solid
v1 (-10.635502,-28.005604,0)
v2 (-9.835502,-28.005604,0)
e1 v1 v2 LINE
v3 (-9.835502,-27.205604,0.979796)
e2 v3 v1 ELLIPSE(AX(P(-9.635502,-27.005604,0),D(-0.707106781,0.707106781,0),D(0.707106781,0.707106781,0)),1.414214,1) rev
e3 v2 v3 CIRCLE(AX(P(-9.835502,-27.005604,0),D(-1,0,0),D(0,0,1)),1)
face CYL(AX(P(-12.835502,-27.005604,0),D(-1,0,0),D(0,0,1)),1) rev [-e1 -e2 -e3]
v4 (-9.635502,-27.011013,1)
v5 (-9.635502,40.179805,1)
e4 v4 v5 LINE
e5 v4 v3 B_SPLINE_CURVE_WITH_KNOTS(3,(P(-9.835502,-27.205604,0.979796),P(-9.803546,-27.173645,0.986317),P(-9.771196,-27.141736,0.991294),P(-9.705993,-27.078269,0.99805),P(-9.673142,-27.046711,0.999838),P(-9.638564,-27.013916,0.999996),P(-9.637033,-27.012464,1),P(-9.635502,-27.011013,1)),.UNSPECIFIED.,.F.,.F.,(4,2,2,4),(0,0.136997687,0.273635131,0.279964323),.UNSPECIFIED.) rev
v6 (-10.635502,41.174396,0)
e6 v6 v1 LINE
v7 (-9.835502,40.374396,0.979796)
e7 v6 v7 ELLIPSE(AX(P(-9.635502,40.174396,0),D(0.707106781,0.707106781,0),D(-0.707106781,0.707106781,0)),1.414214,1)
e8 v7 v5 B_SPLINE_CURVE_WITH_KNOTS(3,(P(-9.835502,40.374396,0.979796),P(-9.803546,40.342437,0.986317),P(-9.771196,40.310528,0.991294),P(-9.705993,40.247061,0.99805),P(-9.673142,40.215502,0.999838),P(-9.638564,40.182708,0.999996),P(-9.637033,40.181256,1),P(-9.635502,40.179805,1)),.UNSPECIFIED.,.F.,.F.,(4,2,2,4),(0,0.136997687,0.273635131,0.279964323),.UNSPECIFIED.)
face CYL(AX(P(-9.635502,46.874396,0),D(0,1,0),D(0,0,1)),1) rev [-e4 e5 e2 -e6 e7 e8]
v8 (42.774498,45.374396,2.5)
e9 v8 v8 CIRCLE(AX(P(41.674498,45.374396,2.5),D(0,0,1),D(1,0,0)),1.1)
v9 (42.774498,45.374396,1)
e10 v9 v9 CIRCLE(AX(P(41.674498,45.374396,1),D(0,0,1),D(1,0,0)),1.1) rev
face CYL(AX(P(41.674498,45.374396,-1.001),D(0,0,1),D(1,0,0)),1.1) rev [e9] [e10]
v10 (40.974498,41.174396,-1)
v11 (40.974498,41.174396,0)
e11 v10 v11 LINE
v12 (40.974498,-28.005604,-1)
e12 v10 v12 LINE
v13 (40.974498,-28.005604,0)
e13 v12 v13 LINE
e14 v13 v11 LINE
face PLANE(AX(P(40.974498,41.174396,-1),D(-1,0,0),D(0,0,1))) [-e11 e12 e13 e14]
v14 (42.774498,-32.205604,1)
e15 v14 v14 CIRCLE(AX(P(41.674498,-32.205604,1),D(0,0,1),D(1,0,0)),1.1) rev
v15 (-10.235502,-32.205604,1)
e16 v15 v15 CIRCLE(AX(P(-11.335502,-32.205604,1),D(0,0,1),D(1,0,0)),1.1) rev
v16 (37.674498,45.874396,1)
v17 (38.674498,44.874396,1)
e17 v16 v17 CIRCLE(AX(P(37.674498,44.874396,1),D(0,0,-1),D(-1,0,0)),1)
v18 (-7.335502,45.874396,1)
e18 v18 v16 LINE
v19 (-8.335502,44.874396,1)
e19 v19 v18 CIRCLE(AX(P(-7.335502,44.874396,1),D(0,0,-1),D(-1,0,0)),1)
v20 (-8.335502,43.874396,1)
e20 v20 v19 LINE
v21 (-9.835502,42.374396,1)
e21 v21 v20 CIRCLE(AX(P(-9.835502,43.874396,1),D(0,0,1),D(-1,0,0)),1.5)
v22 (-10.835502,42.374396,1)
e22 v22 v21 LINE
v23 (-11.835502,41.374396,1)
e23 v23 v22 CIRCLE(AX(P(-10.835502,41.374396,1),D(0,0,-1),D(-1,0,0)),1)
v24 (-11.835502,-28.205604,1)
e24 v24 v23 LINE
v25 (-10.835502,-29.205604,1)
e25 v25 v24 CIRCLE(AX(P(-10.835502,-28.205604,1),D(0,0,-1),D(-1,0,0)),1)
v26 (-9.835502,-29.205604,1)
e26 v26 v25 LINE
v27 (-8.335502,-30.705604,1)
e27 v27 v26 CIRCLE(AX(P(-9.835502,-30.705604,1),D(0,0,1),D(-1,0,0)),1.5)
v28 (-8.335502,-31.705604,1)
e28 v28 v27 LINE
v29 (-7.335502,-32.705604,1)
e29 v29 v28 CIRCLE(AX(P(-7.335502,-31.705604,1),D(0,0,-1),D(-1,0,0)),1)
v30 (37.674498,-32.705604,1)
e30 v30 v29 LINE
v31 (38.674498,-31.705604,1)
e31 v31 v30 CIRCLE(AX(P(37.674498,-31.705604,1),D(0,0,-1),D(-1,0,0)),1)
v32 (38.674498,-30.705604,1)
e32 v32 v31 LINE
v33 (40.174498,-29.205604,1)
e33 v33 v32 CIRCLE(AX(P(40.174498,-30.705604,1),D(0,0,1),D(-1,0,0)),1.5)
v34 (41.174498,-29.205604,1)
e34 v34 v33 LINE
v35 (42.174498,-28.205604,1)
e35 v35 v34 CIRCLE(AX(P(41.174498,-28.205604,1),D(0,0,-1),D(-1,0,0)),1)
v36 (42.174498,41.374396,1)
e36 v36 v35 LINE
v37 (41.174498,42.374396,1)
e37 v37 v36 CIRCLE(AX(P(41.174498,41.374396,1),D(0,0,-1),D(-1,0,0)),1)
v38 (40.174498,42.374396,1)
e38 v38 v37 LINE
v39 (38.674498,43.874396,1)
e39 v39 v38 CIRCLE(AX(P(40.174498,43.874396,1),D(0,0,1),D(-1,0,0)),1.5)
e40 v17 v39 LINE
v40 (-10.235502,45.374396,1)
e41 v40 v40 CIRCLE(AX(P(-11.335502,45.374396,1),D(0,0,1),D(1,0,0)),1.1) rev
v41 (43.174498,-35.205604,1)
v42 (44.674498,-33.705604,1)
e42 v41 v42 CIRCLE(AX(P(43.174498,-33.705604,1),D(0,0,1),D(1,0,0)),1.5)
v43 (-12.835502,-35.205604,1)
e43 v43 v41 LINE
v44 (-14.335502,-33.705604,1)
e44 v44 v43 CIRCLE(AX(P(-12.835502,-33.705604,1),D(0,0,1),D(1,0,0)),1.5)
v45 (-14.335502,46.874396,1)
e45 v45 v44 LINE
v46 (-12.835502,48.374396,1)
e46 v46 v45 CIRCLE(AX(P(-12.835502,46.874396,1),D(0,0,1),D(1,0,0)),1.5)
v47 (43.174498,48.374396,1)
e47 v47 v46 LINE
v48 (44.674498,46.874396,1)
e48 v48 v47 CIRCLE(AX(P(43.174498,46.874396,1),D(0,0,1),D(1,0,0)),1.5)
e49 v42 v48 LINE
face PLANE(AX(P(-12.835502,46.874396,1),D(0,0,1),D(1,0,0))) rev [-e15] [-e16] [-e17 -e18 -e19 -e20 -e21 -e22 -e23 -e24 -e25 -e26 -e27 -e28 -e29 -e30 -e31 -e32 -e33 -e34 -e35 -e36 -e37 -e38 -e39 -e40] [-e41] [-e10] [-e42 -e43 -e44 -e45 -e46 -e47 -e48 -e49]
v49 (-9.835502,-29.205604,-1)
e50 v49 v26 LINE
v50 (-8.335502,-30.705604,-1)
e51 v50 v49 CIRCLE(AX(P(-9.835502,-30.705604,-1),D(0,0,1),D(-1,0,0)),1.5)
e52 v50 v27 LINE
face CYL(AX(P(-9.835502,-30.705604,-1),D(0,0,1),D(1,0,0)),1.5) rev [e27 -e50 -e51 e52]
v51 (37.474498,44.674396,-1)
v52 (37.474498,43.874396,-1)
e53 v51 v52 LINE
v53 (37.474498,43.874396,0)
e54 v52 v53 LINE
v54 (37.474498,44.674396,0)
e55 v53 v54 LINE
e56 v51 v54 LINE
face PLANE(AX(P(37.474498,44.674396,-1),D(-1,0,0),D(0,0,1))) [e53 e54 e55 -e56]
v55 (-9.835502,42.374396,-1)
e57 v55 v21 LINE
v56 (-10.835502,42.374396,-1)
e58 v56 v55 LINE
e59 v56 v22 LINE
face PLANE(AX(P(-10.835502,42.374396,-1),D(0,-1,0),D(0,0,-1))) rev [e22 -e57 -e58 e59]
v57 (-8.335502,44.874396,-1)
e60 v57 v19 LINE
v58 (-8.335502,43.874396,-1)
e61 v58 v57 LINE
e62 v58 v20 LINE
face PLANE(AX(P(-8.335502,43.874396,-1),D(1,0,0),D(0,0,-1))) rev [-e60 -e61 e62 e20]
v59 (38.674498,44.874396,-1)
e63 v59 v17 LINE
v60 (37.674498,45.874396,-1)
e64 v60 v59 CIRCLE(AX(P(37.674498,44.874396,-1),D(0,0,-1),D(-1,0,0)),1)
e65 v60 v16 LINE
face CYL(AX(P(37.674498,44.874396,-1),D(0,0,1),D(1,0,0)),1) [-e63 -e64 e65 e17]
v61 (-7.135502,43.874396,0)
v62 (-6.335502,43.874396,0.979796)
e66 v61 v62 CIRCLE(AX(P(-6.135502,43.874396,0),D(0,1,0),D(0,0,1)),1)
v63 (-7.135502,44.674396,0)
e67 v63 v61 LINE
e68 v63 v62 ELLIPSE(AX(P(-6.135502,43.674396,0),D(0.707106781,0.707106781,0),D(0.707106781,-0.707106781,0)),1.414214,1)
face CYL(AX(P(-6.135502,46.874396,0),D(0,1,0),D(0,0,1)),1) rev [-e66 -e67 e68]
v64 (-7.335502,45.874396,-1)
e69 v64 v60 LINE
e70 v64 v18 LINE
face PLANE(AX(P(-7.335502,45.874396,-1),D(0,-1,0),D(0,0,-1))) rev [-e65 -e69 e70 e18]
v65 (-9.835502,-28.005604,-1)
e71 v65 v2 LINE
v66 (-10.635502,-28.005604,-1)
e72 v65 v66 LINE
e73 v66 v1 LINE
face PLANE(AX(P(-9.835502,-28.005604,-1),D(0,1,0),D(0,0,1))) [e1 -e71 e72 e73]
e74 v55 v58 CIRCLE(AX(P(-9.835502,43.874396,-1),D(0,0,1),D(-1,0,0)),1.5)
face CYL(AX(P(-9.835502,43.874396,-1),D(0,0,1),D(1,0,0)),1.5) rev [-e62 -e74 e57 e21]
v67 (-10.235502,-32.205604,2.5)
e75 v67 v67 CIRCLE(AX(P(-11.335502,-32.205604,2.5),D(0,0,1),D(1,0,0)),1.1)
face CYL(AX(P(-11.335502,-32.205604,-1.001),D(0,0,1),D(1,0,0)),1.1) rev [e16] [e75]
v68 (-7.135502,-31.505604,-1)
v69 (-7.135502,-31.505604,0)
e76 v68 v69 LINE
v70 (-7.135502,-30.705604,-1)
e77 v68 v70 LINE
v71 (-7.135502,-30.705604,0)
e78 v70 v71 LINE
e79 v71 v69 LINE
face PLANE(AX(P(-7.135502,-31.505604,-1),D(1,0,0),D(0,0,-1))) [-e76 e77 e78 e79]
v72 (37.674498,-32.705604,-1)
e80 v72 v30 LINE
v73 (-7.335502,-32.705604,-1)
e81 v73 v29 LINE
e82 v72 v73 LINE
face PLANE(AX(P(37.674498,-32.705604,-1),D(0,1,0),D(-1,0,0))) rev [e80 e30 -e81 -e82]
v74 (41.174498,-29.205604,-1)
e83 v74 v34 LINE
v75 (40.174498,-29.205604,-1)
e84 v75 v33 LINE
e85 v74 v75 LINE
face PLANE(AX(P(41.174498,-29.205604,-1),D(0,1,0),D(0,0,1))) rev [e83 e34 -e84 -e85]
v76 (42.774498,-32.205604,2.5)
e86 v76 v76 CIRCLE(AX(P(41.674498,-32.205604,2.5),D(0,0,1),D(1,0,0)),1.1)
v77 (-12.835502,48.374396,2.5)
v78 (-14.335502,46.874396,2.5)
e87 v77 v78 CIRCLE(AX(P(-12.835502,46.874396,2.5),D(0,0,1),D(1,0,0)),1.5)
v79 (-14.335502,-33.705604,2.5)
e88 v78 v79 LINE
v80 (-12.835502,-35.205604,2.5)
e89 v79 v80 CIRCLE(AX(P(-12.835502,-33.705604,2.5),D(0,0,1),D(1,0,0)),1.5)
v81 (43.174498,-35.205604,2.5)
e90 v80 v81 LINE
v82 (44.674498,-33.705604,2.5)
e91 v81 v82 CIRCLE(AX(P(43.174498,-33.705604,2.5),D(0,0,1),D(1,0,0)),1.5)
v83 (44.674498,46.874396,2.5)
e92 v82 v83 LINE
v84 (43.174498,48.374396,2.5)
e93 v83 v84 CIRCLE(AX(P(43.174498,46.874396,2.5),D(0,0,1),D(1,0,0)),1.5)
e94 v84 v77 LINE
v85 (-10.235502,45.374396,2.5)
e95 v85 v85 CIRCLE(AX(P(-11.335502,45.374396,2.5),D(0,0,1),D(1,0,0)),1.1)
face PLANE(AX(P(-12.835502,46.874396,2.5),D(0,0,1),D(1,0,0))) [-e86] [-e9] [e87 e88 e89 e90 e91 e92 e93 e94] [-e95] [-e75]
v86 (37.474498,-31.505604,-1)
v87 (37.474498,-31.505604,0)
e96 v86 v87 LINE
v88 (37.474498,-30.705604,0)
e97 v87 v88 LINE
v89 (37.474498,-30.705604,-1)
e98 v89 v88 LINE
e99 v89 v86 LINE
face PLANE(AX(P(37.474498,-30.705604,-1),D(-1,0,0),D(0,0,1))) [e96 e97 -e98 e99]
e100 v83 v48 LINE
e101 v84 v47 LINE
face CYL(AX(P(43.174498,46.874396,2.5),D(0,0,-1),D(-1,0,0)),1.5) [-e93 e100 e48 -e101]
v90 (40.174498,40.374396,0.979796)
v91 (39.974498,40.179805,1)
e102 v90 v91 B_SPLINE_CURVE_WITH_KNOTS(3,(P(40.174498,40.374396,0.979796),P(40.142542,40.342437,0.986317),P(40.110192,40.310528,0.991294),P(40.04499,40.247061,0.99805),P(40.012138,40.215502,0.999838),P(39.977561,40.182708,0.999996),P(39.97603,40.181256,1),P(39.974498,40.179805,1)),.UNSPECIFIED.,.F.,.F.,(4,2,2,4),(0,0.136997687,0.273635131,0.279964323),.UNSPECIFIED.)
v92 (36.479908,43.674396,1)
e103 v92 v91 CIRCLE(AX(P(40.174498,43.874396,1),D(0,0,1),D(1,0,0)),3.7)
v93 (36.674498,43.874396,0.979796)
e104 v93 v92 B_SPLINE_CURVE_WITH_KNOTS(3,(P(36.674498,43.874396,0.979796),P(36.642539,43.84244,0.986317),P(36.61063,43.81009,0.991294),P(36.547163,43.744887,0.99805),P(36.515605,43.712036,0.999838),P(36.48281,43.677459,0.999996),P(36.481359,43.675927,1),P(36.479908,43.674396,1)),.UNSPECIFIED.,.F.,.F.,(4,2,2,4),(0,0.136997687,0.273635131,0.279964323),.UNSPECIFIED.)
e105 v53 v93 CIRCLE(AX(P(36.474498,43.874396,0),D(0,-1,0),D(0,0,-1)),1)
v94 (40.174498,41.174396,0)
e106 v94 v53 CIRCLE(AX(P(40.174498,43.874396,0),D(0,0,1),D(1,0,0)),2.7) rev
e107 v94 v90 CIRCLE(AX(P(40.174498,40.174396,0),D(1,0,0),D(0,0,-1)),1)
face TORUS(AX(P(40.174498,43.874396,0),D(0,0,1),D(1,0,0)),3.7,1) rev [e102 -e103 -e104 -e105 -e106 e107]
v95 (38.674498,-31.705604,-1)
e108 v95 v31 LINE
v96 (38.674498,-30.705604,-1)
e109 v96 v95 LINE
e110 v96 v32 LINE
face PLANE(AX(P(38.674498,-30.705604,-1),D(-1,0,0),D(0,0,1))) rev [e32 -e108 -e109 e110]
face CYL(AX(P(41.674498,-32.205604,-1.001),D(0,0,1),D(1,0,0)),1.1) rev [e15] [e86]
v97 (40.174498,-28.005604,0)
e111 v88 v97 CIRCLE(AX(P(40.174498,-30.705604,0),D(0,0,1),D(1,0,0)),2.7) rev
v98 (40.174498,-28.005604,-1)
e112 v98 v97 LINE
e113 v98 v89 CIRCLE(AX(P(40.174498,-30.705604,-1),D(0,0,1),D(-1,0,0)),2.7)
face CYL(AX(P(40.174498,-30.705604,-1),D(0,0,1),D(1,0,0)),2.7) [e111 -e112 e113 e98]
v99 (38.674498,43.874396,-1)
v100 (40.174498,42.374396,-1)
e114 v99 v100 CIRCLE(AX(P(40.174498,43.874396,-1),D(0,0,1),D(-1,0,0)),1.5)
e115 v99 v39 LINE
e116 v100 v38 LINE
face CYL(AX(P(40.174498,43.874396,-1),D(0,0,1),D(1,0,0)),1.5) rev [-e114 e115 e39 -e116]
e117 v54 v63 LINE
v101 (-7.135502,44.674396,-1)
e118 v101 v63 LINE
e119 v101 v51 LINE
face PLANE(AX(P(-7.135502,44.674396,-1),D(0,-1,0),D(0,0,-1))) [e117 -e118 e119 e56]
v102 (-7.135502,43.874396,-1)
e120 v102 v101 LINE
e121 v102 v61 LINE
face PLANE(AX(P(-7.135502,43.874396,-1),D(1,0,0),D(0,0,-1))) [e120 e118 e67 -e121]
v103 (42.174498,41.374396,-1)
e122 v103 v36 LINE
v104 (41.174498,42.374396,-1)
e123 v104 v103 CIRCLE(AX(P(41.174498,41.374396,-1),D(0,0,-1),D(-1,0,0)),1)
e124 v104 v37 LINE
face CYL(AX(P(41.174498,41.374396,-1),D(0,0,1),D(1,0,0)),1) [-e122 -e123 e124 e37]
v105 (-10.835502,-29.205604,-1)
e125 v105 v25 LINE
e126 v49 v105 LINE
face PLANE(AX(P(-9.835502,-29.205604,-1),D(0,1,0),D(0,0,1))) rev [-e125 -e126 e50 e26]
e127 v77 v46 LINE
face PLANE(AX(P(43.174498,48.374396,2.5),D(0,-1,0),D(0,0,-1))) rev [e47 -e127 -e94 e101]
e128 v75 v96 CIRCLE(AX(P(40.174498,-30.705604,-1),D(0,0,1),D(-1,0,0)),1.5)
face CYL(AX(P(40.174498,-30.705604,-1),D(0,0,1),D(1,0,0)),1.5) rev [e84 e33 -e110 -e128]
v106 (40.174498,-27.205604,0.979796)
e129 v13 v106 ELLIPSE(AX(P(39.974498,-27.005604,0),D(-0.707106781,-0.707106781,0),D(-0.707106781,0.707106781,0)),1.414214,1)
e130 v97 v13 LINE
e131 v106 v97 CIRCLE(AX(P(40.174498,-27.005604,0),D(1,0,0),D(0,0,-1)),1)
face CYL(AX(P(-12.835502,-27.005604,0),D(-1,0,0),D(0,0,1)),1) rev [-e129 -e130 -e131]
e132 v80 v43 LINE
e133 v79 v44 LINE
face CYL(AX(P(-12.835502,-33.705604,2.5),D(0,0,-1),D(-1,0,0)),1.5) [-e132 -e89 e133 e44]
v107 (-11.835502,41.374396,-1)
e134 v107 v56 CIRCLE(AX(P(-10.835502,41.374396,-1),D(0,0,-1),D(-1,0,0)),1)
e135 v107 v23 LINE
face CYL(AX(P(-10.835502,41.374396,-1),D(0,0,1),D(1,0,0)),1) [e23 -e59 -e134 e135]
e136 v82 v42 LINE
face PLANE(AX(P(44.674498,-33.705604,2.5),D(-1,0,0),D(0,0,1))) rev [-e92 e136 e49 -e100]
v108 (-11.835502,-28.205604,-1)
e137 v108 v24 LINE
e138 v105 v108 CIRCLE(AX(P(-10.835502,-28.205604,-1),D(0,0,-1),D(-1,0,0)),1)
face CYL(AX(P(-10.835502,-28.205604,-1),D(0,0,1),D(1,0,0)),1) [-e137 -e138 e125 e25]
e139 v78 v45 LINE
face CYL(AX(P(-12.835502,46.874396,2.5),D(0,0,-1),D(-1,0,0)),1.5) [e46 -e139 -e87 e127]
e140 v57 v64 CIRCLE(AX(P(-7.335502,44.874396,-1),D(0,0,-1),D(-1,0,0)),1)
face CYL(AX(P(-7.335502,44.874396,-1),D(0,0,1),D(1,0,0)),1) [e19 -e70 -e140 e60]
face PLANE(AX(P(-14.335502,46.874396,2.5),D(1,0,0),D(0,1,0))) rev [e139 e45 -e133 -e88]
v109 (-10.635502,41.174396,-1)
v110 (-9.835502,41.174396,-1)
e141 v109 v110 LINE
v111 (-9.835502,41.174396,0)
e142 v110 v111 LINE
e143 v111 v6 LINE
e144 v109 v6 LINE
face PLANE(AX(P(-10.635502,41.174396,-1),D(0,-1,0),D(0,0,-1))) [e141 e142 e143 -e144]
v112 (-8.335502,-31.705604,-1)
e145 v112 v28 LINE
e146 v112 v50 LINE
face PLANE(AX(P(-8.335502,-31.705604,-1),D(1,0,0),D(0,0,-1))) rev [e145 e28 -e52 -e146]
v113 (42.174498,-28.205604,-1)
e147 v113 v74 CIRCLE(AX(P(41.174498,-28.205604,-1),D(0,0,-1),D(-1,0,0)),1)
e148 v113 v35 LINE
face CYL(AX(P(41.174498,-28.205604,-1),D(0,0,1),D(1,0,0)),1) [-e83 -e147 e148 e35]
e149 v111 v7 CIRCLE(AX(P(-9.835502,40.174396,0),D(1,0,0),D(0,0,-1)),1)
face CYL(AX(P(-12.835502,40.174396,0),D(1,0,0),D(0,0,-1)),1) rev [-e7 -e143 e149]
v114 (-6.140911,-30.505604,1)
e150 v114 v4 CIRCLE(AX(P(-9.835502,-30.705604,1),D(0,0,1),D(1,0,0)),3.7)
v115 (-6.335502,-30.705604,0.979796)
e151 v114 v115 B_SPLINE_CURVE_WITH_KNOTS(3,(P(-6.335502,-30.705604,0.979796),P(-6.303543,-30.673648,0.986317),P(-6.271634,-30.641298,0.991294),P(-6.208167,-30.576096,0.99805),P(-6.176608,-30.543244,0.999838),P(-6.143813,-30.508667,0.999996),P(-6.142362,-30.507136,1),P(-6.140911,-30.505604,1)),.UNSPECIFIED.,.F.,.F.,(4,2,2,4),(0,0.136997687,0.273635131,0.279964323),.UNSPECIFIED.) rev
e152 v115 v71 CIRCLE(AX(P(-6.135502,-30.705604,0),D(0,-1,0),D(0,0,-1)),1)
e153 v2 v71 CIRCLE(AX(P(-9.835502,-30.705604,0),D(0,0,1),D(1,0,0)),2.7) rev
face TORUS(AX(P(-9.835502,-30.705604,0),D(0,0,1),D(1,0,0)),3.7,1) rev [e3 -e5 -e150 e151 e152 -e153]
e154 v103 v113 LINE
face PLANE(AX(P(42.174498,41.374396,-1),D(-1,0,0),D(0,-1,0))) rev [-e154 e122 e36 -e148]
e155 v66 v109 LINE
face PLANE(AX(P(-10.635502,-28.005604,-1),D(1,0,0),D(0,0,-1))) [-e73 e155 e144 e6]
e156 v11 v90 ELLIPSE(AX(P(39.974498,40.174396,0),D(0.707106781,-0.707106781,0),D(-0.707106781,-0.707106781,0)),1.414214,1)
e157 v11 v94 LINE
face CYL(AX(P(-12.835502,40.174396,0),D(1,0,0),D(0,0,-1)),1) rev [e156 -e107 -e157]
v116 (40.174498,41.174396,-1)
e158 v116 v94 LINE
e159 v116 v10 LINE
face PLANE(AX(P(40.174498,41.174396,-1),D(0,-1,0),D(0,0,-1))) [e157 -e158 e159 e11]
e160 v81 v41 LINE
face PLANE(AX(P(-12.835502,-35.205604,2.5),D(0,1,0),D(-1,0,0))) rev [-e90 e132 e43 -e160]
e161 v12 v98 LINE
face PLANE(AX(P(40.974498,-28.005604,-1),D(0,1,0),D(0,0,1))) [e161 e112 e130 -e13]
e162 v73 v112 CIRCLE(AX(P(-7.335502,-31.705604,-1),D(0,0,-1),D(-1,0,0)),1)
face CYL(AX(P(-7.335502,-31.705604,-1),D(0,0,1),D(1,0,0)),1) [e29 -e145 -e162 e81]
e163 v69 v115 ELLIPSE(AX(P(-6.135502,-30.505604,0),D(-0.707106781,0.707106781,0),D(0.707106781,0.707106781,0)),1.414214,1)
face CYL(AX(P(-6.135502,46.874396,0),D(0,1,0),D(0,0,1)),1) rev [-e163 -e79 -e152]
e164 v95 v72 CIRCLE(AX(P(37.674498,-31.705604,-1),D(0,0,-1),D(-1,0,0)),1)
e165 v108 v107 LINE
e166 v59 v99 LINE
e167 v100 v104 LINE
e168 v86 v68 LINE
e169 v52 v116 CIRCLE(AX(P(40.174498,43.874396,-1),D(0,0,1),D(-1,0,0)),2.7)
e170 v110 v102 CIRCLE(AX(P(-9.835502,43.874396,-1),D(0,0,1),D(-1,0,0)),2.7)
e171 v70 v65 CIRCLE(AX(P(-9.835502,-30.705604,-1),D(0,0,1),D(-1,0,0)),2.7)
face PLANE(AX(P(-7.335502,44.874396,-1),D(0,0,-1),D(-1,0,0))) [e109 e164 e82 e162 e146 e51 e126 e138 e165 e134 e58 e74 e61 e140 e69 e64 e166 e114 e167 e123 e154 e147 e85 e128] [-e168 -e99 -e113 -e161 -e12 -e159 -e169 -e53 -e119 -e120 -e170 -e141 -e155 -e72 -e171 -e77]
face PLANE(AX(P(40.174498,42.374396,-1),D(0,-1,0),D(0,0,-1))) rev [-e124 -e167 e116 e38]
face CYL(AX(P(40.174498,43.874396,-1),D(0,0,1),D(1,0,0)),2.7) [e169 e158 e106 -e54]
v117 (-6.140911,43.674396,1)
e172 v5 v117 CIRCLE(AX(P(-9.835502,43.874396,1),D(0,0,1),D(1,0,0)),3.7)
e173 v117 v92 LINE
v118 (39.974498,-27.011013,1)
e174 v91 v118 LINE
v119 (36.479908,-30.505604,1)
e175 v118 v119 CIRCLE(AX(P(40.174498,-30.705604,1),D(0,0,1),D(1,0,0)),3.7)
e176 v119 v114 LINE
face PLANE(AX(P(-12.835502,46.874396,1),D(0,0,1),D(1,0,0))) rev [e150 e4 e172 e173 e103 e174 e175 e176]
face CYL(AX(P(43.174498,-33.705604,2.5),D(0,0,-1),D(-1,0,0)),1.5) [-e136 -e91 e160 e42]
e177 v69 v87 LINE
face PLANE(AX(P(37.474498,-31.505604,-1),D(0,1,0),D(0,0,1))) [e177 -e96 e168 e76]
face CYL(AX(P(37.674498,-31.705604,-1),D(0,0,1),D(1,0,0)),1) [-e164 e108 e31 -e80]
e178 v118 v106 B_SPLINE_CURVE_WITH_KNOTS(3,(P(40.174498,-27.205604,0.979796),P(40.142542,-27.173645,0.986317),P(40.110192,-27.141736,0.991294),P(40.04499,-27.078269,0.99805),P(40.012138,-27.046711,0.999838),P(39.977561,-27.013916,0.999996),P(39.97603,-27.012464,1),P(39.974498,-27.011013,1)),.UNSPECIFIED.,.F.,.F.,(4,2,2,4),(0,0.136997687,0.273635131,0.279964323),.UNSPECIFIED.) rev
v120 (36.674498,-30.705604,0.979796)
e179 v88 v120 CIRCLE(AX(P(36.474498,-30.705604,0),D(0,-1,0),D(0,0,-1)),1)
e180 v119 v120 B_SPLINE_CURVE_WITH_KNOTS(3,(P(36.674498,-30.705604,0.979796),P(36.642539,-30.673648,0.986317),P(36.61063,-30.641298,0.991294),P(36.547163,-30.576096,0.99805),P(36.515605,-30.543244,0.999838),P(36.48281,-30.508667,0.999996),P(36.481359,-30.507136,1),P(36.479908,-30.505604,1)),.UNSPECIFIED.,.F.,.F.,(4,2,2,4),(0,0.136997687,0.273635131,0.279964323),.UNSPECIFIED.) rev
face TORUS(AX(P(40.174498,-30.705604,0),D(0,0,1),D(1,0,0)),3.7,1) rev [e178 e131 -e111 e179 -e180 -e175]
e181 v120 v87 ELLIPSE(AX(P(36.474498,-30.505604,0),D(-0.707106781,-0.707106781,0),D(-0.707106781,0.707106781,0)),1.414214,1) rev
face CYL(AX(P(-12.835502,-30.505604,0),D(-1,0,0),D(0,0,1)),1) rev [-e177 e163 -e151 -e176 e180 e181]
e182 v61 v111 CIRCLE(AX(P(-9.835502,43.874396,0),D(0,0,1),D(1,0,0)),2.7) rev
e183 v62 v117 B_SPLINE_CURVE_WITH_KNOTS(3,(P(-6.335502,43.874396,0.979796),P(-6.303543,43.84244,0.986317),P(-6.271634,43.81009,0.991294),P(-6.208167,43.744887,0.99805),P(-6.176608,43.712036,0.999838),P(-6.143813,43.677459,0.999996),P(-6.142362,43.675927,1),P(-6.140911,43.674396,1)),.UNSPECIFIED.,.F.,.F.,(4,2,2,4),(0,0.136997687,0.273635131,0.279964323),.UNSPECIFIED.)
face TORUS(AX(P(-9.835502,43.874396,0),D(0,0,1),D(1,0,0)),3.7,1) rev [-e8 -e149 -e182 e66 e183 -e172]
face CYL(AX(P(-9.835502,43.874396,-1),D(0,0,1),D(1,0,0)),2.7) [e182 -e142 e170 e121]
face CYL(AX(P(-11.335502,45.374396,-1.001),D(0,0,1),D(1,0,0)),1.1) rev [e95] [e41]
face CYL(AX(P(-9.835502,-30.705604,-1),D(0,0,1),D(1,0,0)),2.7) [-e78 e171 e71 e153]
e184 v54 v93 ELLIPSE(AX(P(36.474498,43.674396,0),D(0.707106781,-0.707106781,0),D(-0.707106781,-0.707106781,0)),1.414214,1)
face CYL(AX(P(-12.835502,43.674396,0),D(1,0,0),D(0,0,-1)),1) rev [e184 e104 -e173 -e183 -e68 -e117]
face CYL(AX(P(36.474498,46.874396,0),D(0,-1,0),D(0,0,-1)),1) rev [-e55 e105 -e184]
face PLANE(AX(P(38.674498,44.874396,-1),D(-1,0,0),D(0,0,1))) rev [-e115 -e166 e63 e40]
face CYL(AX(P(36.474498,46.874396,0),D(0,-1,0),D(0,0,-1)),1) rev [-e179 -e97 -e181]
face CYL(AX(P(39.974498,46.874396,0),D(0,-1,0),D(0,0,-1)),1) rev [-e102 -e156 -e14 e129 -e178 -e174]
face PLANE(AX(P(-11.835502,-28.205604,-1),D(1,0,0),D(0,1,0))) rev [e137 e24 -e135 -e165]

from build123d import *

# Parameters (mm, degrees)
LID_BASE_DEPTH = 1.5
INSERT_DEPTH   = 2
CONG_1_R       = 1
M3_HOLE_REACH  = 67.94
ESQUISSE5_R    = 1.1


with BuildPart() as part:
    # Esquisse3 → Lid_Base (new body)
    with BuildSketch(Plane.XY.offset(1)):
        with BuildLine():
            Line((-14.335501752, 46.874395923), (-14.335501752, -33.705604077))
            ThreePointArc((-14.335501752, -33.705604077), (-13.896161923, -34.766264249), (-12.835501752, -35.205604077))
            Line((-12.835501752, -35.205604077), (43.174498248, -35.205604077))
            ThreePointArc((43.174498248, -35.205604077), (44.23515842, -34.766264249), (44.674498248, -33.705604077))
            Line((44.674498248, -33.705604077), (44.674498248, 46.874395923))
            ThreePointArc((44.674498248, 46.874395923), (44.23515842, 47.935056095), (43.174498248, 48.374395923))
            Line((43.174498248, 48.374395923), (-12.835501752, 48.374395923))
            ThreePointArc((-12.835501752, 48.374395923), (-13.896161923, 47.935056095), (-14.335501752, 46.874395923))
        make_face()
    extrude(amount=LID_BASE_DEPTH)

    # Esquisse4 → Insert (add)
    with BuildSketch(Plane(origin=(0, 0, 1), x_dir=(-1, 0, 0), z_dir=(0, 0, -1))):
        with BuildLine():
            Line((7.335501752, 45.874395923), (-37.674498248, 45.874395923))
            ThreePointArc((-37.674498248, 45.874395923), (-38.38160503, 45.581502704), (-38.674498248, 44.874395923))
            Line((-38.674498248, 44.874395923), (-38.674498248, 43.874395923))
            ThreePointArc((-38.674498248, 43.874395923), (-39.113838077, 42.813735751), (-40.174498248, 42.374395923))
            Line((-40.174498248, 42.374395923), (-41.174498248, 42.374395923))
            ThreePointArc((-41.174498248, 42.374395923), (-41.88160503, 42.081502704), (-42.174498248, 41.374395923))
            Line((-42.174498248, 41.374395923), (-42.174498248, -28.205604077))
            ThreePointArc((-42.174498248, -28.205604077), (-41.88160503, -28.912710858), (-41.174498248, -29.205604077))
            Line((-41.174498248, -29.205604077), (-40.174498248, -29.205604077))
            ThreePointArc((-40.174498248, -29.205604077), (-39.113838077, -29.644943905), (-38.674498248, -30.705604077))
            Line((-38.674498248, -30.705604077), (-38.674498248, -31.705604077))
            ThreePointArc((-38.674498248, -31.705604077), (-38.38160503, -32.412710858), (-37.674498248, -32.705604077))
            Line((-37.674498248, -32.705604077), (7.335501752, -32.705604077))
            ThreePointArc((7.335501752, -32.705604077), (8.042608533, -32.412710858), (8.335501752, -31.705604077))
            Line((8.335501752, -31.705604077), (8.335501752, -30.705604077))
            ThreePointArc((8.335501752, -30.705604077), (8.77484158, -29.644943905), (9.835501752, -29.205604077))
            Line((9.835501752, -29.205604077), (10.835501752, -29.205604077))
            ThreePointArc((10.835501752, -29.205604077), (11.542608533, -28.912710858), (11.835501752, -28.205604077))
            Line((11.835501752, -28.205604077), (11.835501752, 41.374395923))
            ThreePointArc((11.835501752, 41.374395923), (11.542608533, 42.081502704), (10.835501752, 42.374395923))
            Line((10.835501752, 42.374395923), (9.835501752, 42.374395923))
            ThreePointArc((9.835501752, 42.374395923), (8.77484158, 42.813735751), (8.335501752, 43.874395923))
            Line((8.335501752, 43.874395923), (8.335501752, 44.874395923))
            ThreePointArc((8.335501752, 44.874395923), (8.042608533, 45.581502704), (7.335501752, 45.874395923))
        make_face()
        with BuildLine():
            Line((7.135501752, 44.674395923), (-37.474498248, 44.674395923))
            Line((-37.474498248, 44.674395923), (-37.474498248, 43.874395923))
            ThreePointArc((-37.474498248, 43.874395923), (-38.265309939, 41.965207614), (-40.174498248, 41.174395923))
            Line((-40.174498248, 41.174395923), (-40.974498248, 41.174395923))
            Line((-40.974498248, 41.174395923), (-40.974498248, -28.005604077))
            Line((-40.974498248, -28.005604077), (-40.174498248, -28.005604077))
            ThreePointArc((-40.174498248, -28.005604077), (-38.265309939, -28.796415768), (-37.474498248, -30.705604077))
            Line((-37.474498248, -30.705604077), (-37.474498248, -31.505604077))
            Line((-37.474498248, -31.505604077), (7.135501752, -31.505604077))
            Line((7.135501752, -31.505604077), (7.135501752, -30.705604077))
            ThreePointArc((7.135501752, -30.705604077), (7.926313442, -28.796415768), (9.835501752, -28.005604077))
            Line((9.835501752, -28.005604077), (10.635501752, -28.005604077))
            Line((10.635501752, -28.005604077), (10.635501752, 41.174395923))
            Line((10.635501752, 41.174395923), (9.835501752, 41.174395923))
            ThreePointArc((9.835501752, 41.174395923), (7.926313442, 41.965207614), (7.135501752, 43.874395923))
            Line((7.135501752, 43.874395923), (7.135501752, 44.674395923))
        make_face(mode=Mode.SUBTRACT)
    extrude(amount=INSERT_DEPTH)

    # Congé1
    # the kernel refuses this fillet: 1 mm, written as the material it adds along each edge
    with BuildSketch(Plane(origin=(-10.635501752, -28.005604077, 1), x_dir=(0, 0, -1), z_dir=(0, 1, 0)), Plane(origin=(40.974498248, 41.174395923, 1), x_dir=(0, 0, -1), z_dir=(0, -1, 0))) as cong_1_piece_1:
        with BuildLine():
            CenterArc((CONG_1_R, -CONG_1_R), CONG_1_R, 90, 90)
            Line((0, -CONG_1_R), (0, 0))
            Line((0, 0), (CONG_1_R, 0))
        make_face()
    extrude(amount=69.18)
    with BuildSketch(Plane(origin=(-9.835501752, -30.705604077, 1), x_dir=(1, 0, 0), z_dir=(0, -1, 0))) as cong_1_piece_2:
        with BuildLine():
            CenterArc((2.7 + CONG_1_R, -CONG_1_R), CONG_1_R, 90, 90)
            Line((2.7 + CONG_1_R, 0), (2.7, 0))
            Line((2.7, 0), (2.7, -CONG_1_R))
        make_face()
    revolve(axis=Axis((-9.835501752, -30.705604077, 1), (0, 0, 1)), revolution_arc=90)
    with BuildSketch(Plane(origin=(37.474498248, -31.505604077, 1), x_dir=(0, 0, -1), z_dir=(-1, 0, 0)), Plane(origin=(-7.135501752, 44.674395923, 1), x_dir=(0, 0, -1), z_dir=(1, 0, 0))) as cong_1_piece_3:
        with BuildLine():
            CenterArc((CONG_1_R, -CONG_1_R), CONG_1_R, 90, 90)
            Line((0, -CONG_1_R), (0, 0))
            Line((0, 0), (CONG_1_R, 0))
        make_face()
    extrude(amount=44.61)
    with BuildSketch(Plane(origin=(40.174498248, -30.705604077, 1), x_dir=(0, 1, 0), z_dir=(1, 0, 0))) as cong_1_piece_4:
        with BuildLine():
            CenterArc((2.7 + CONG_1_R, -CONG_1_R), CONG_1_R, 90, 90)
            Line((2.7 + CONG_1_R, 0), (2.7, 0))
            Line((2.7, 0), (2.7, -CONG_1_R))
        make_face()
    revolve(axis=Axis((40.174498248, -30.705604077, 1), (0, 0, 1)), revolution_arc=90)
    with BuildSketch(Plane(origin=(40.174498248, 43.874395923, 1), x_dir=(-1, 0, 0), z_dir=(0, 1, 0))) as cong_1_piece_5:
        with BuildLine():
            CenterArc((2.7 + CONG_1_R, -CONG_1_R), CONG_1_R, 90, 90)
            Line((2.7 + CONG_1_R, 0), (2.7, 0))
            Line((2.7, 0), (2.7, -CONG_1_R))
        make_face()
    revolve(axis=Axis((40.174498248, 43.874395923, 1), (0, 0, 1)), revolution_arc=90)
    with BuildSketch(Plane(origin=(-9.835501752, 43.874395923, 1), x_dir=(0, -1, 0), z_dir=(-1, 0, 0))) as cong_1_piece_6:
        with BuildLine():
            CenterArc((2.7 + CONG_1_R, -CONG_1_R), CONG_1_R, 90, 90)
            Line((2.7 + CONG_1_R, 0), (2.7, 0))
            Line((2.7, 0), (2.7, -CONG_1_R))
        make_face()
    revolve(axis=Axis((-9.835501752, 43.874395923, 1), (0, 0, 1)), revolution_arc=90)
    with BuildSketch(Plane(origin=(-10.635501752, 41.174395923, 1), x_dir=(0, 0, -1), z_dir=(1, 0, 0)), Plane(origin=(-7.135501752, 43.874395923, 1), x_dir=(0, 0, -1), z_dir=(0, 1, 0)), Plane(origin=(37.474498248, 44.674395923, 1), x_dir=(0, 0, -1), z_dir=(0, -1, 0)), Plane(origin=(40.174498248, 41.174395923, 1), x_dir=(0, 0, -1), z_dir=(1, 0, 0)), Plane(origin=(40.974498248, -28.005604077, 1), x_dir=(0, 0, -1), z_dir=(-1, 0, 0)), Plane(origin=(37.474498248, -30.705604077, 1), x_dir=(0, 0, -1), z_dir=(0, -1, 0)), Plane(origin=(-7.135501752, -31.505604077, 1), x_dir=(0, 0, -1), z_dir=(0, 1, 0)), Plane(origin=(-9.835501752, -28.005604077, 1), x_dir=(0, 0, -1), z_dir=(-1, 0, 0))) as cong_1_piece_7:
        with BuildLine():
            CenterArc((CONG_1_R, -CONG_1_R), CONG_1_R, 90, 90)
            Line((0, -CONG_1_R), (0, 0))
            Line((0, 0), (CONG_1_R, 0))
        make_face()
    extrude(amount=0.8)

    # Esquisse5 → M3_Hole (cut, up to next)
    with BuildSketch(Plane.XY.offset(2.5), mode=Mode.PRIVATE) as m3_hole_sk1:
        with Locations((-11.335501752, -32.205604077)):
            Circle(ESQUISSE5_R)
    m3_hole_tool1 = extrude(m3_hole_sk1.sketch, amount=-M3_HOLE_REACH, mode=Mode.PRIVATE) & part.part
    # Esquisse5 → M3_Hole (cut, up to next)
    with BuildSketch(Plane.XY.offset(2.5), mode=Mode.PRIVATE) as m3_hole_sk2:
        with Locations((-11.335501752, 45.374395923)):
            Circle(ESQUISSE5_R)
    m3_hole_tool2 = extrude(m3_hole_sk2.sketch, amount=-M3_HOLE_REACH, mode=Mode.PRIVATE) & part.part
    # Esquisse5 → M3_Hole (cut, up to next)
    with BuildSketch(Plane.XY.offset(2.5), mode=Mode.PRIVATE) as m3_hole_sk3:
        with Locations((41.674498248, 45.374395923)):
            Circle(ESQUISSE5_R)
    m3_hole_tool3 = extrude(m3_hole_sk3.sketch, amount=-M3_HOLE_REACH, mode=Mode.PRIVATE) & part.part
    # Esquisse5 → M3_Hole (cut, up to next)
    with BuildSketch(Plane.XY.offset(2.5), mode=Mode.PRIVATE) as m3_hole_sk4:
        with Locations((41.674498248, -32.205604077)):
            Circle(ESQUISSE5_R)
    m3_hole_tool4 = extrude(m3_hole_sk4.sketch, amount=-M3_HOLE_REACH, mode=Mode.PRIVATE) & part.part
    add(m3_hole_tool1.solids().sort_by_distance((-11.335502, -32.205604, 2.5))[0], mode=Mode.SUBTRACT)
    add(m3_hole_tool2.solids().sort_by_distance((-11.335502, 45.374396, 2.5))[0], mode=Mode.SUBTRACT)
    add(m3_hole_tool3.solids().sort_by_distance((41.674498, 45.374396, 2.5))[0], mode=Mode.SUBTRACT)
    add(m3_hole_tool4.solids().sort_by_distance((41.674498, -32.205604, 2.5))[0], mode=Mode.SUBTRACT)


solid = part.part
